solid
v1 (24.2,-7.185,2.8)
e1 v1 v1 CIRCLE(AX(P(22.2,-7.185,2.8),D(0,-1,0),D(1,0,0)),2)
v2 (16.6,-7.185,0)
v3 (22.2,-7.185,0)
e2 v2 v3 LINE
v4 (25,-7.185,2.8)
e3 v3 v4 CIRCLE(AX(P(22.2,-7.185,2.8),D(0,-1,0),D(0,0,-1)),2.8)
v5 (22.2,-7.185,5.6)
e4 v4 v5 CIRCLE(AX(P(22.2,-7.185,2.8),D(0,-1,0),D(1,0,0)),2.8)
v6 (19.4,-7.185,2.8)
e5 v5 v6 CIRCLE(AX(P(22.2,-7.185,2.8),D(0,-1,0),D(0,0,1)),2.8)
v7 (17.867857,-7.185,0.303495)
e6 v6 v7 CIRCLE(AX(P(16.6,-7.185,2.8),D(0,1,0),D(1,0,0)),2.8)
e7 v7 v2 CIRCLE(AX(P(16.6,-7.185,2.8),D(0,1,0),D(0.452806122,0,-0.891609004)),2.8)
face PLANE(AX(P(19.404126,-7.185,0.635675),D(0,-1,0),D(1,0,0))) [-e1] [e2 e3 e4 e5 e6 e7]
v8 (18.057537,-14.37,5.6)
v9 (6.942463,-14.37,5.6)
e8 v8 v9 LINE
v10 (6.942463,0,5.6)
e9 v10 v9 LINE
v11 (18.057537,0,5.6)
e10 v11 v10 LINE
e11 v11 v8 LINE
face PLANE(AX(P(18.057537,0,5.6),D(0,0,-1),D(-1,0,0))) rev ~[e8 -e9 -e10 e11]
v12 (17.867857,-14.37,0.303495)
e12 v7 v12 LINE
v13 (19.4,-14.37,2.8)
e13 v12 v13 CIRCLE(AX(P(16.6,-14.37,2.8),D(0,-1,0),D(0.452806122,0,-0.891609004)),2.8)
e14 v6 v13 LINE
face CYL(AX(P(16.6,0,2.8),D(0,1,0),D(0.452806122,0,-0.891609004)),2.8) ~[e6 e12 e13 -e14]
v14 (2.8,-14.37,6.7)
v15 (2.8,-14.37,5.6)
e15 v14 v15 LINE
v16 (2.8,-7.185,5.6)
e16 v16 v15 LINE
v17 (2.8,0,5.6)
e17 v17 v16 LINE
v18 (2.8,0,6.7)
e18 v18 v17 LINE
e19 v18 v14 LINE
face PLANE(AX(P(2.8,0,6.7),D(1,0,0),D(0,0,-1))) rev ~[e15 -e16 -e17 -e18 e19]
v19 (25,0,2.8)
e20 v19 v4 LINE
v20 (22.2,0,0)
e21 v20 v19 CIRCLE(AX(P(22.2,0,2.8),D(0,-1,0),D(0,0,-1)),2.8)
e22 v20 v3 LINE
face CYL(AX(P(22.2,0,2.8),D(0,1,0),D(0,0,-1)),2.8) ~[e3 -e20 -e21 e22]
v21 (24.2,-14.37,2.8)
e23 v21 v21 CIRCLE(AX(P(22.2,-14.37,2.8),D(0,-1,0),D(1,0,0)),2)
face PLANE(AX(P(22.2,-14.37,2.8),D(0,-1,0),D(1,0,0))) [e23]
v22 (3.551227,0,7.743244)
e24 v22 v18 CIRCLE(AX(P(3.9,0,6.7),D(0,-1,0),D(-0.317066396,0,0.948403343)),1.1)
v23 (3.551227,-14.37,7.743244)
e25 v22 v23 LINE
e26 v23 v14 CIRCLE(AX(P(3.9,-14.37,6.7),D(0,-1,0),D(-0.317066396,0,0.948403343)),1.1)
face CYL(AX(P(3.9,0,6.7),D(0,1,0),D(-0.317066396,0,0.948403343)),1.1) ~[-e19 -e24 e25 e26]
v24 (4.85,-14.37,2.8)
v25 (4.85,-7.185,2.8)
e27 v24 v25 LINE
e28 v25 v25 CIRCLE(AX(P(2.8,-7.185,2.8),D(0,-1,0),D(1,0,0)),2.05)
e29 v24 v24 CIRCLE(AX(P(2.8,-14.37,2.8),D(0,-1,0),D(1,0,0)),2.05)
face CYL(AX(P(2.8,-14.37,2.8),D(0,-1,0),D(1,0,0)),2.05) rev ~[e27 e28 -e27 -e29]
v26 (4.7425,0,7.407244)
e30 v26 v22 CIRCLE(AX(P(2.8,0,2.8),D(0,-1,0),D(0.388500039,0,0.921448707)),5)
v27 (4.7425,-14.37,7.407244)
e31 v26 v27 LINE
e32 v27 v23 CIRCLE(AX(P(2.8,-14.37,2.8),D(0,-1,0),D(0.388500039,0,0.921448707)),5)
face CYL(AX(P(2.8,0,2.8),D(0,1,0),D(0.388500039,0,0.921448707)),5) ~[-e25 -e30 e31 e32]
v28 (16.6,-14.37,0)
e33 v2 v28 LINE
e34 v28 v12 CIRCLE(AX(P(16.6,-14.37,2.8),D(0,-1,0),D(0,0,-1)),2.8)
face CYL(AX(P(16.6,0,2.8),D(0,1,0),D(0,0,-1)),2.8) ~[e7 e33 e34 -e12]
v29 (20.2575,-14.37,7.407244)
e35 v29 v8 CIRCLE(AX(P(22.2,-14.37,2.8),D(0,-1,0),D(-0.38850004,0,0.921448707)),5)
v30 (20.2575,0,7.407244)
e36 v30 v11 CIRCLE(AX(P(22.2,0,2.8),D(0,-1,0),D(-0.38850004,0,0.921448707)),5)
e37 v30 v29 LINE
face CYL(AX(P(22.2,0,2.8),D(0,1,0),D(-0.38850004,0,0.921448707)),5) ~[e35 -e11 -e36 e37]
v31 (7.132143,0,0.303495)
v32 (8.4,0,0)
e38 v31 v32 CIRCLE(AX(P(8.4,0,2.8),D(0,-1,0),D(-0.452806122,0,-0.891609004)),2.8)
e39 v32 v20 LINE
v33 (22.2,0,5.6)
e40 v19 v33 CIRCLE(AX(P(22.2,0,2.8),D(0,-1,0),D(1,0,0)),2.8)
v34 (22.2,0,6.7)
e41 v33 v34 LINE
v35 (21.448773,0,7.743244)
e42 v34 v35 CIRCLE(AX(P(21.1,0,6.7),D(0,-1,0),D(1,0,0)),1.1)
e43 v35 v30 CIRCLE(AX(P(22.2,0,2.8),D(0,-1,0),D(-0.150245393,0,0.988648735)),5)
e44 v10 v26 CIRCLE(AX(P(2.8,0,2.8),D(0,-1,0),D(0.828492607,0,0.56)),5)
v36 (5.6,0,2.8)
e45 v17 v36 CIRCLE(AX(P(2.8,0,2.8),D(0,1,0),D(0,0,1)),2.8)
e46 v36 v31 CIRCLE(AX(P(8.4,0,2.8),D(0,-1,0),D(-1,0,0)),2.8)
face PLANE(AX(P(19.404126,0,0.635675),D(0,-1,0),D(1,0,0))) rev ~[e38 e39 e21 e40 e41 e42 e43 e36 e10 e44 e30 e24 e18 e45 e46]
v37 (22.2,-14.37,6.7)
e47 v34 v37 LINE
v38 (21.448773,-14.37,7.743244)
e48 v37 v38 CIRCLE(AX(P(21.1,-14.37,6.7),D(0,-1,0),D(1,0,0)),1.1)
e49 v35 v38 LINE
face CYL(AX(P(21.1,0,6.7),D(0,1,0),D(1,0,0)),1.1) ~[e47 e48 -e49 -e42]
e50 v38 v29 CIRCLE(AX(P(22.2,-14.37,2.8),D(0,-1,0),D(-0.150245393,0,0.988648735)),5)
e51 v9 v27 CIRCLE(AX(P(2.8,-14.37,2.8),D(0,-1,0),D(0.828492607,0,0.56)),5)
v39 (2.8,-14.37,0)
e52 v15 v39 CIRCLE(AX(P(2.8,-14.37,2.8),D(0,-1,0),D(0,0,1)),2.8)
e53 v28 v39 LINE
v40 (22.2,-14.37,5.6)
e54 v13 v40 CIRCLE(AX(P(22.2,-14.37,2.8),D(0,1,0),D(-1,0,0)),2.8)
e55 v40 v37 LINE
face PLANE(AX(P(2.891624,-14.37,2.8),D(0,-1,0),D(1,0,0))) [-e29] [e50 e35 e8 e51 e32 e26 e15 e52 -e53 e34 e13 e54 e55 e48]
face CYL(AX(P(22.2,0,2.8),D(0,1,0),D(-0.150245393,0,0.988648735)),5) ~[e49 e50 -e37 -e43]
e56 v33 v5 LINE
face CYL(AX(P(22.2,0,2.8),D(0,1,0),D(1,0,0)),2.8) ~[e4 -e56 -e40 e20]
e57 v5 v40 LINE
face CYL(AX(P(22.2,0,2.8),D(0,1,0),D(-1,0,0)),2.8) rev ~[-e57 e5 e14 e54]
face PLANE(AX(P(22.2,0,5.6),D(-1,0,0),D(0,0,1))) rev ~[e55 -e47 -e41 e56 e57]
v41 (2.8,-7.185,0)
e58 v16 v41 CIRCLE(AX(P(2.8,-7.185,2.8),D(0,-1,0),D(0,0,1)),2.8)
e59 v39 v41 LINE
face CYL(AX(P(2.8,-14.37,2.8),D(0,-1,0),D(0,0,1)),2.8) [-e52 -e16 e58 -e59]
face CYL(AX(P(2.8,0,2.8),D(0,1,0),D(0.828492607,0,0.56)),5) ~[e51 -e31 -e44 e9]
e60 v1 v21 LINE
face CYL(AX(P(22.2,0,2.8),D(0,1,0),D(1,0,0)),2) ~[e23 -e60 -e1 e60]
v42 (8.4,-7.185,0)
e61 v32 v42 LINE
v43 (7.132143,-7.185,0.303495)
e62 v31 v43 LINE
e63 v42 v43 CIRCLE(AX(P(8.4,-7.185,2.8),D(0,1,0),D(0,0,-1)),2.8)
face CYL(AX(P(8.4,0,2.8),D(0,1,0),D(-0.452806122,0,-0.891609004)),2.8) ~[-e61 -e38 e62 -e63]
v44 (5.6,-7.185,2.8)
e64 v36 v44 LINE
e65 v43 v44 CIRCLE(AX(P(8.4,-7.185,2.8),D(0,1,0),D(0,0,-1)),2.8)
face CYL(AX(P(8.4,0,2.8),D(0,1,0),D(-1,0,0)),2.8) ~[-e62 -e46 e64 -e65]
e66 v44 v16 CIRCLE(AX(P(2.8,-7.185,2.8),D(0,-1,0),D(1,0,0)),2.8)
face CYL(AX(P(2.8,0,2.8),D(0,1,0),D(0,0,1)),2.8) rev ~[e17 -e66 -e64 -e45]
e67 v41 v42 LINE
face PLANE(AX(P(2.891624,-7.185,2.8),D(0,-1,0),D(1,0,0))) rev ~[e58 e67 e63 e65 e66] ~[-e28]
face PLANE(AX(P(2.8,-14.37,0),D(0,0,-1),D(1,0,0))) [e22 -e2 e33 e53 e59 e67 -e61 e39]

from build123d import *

# Parameters (mm, degrees)
F1_DEPTH = 14.37
F0_R     = 2
F2_DEPTH = 7.185
F3_R     = 2.05
F4_DEPTH = 7.185


with BuildPart() as f1:
    # F0 (on Front) → F1 (new body)
    with BuildSketch(Plane.XZ):
        with BuildLine():
            ThreePointArc((7.1321428571, 0.3034947896), (7.7481620558, 0.0769305381), (8.4, 0))
            Line((8.4, 0), (16.6, 0))
            ThreePointArc((16.6, 0), (17.2518379442, 0.0769305381), (17.8678571429, 0.3034947896))
            ThreePointArc((17.8678571429, 0.3034947896), (18.9864199128, 1.3354181484), (19.4, 2.8))
            ThreePointArc((19.4, 2.8), (20.2201010127, 4.7798989873), (22.2, 5.6))
            Line((22.2, 5.6), (22.2, 6.7))
            ThreePointArc((22.2, 6.7), (21.8778174593, 5.9221825407), (21.1, 5.6))
            Line((21.1, 5.6), (18.0575369646, 5.6))
            Line((18.0575369646, 5.6), (6.9424630354, 5.6))
            Line((6.9424630354, 5.6), (3.9, 5.6))
            Line((3.9, 5.6), (2.8, 5.6))
            ThreePointArc((2.8, 5.6), (4.7798989873, 4.7798989873), (5.6, 2.8))
            ThreePointArc((5.6, 2.8), (6.0135800872, 1.3354181484), (7.1321428571, 0.3034947896))
        make_face()
        with BuildLine():
            ThreePointArc((20.2574998019, 7.4072435339), (19.0261653027, 6.6635182559), (18.0575369646, 5.6))
            Line((18.0575369646, 5.6), (21.1, 5.6))
            ThreePointArc((21.1, 5.6), (20.103012566, 6.2352247249), (20.2574998019, 7.4072435339))
        make_face()
        with BuildLine():
            ThreePointArc((20.2574998019, 7.4072435339), (20.103012566, 6.2352247249), (21.1, 5.6))
            ThreePointArc((21.1, 5.6), (21.8778174593, 5.9221825407), (22.2, 6.7))
            ThreePointArc((22.2, 6.7), (21.9926506427, 7.3427867688), (21.4487730361, 7.7432436768))
            ThreePointArc((21.4487730361, 7.7432436768), (20.8426991749, 7.6122483799), (20.2574998019, 7.4072435339))
        make_face()
        with BuildLine():
            ThreePointArc((4.7425001981, 7.4072435339), (4.896987434, 6.2352247249), (3.9, 5.6))
            Line((3.9, 5.6), (6.9424630354, 5.6))
            ThreePointArc((6.9424630354, 5.6), (5.9738346973, 6.6635182559), (4.7425001981, 7.4072435339))
        make_face()
        with BuildLine():
            ThreePointArc((2.8, 6.7), (3.1221825407, 5.9221825407), (3.9, 5.6))
            ThreePointArc((3.9, 5.6), (4.896987434, 6.2352247249), (4.7425001981, 7.4072435339))
            ThreePointArc((4.7425001981, 7.4072435339), (4.1573008251, 7.6122483799), (3.5512269639, 7.7432436768))
            ThreePointArc((3.5512269639, 7.7432436768), (3.0073493573, 7.3427867688), (2.8, 6.7))
        make_face()
        with BuildLine():
            Line((2.8, 6.7), (2.8, 5.6))
            Line((2.8, 5.6), (3.9, 5.6))
            ThreePointArc((3.9, 5.6), (3.1221825407, 5.9221825407), (2.8, 6.7))
        make_face()
    extrude(amount=F1_DEPTH)



with BuildPart() as f1b:
    # F0 (on Front) → F1, piece 2 (new body)
    with BuildSketch(Plane.XZ):
        with Locations((22.2, 2.8)):
            Circle(F0_R)
    extrude(amount=F1_DEPTH)


with BuildPart() as f1_1:
    add(f1.part)

    add(f1b.part)  # F2 merges F1b
    # F0 (on Front) → F2 (join)
    with BuildSketch(Plane.XZ):
        with BuildLine():
            ThreePointArc((17.8678571429, 0.3034947896), (17.2518379442, 0.0769305381), (16.6, 0))
            Line((16.6, 0), (22.2, 0))
            ThreePointArc((22.2, 0), (20.2201010127, 0.8201010127), (19.4, 2.8))
            ThreePointArc((19.4, 2.8), (18.9864199128, 1.3354181484), (17.8678571429, 0.3034947896))
        make_face()
        with BuildLine():
            ThreePointArc((19.4, 2.8), (20.2201010127, 0.8201010127), (22.2, 0))
            ThreePointArc((22.2, 0), (24.1798989873, 0.8201010127), (25, 2.8))
            ThreePointArc((25, 2.8), (24.1798989873, 4.7798989873), (22.2, 5.6))
            ThreePointArc((22.2, 5.6), (20.2201010127, 4.7798989873), (19.4, 2.8))
        make_face()
        with Locations((22.2, 2.8)):
            Circle(F0_R, mode=Mode.SUBTRACT)
    extrude(amount=F2_DEPTH)

    # F3 (on face) → F4 (join)
    with BuildSketch(Plane.XZ.offset(14.37)):
        with BuildLine():
            ThreePointArc((2.8, 0), (4.7798989873, 0.8201010127), (5.6, 2.8))
            ThreePointArc((5.6, 2.8), (4.7798989873, 4.7798989873), (2.8, 5.6))
            ThreePointArc((2.8, 5.6), (0, 2.8), (2.8, 0))
        make_face()
        with Locations((2.8, 2.8)):
            Circle(F3_R, mode=Mode.SUBTRACT)
        with BuildLine():
            ThreePointArc((8.4, 0), (6.4201010127, 0.8201010127), (5.6, 2.8))
            ThreePointArc((5.6, 2.8), (4.7798989873, 0.8201010127), (2.8, 0))
            Line((2.8, 0), (8.4, 0))
        make_face()
    extrude(amount=-F4_DEPTH)


solid = f1_1.part
